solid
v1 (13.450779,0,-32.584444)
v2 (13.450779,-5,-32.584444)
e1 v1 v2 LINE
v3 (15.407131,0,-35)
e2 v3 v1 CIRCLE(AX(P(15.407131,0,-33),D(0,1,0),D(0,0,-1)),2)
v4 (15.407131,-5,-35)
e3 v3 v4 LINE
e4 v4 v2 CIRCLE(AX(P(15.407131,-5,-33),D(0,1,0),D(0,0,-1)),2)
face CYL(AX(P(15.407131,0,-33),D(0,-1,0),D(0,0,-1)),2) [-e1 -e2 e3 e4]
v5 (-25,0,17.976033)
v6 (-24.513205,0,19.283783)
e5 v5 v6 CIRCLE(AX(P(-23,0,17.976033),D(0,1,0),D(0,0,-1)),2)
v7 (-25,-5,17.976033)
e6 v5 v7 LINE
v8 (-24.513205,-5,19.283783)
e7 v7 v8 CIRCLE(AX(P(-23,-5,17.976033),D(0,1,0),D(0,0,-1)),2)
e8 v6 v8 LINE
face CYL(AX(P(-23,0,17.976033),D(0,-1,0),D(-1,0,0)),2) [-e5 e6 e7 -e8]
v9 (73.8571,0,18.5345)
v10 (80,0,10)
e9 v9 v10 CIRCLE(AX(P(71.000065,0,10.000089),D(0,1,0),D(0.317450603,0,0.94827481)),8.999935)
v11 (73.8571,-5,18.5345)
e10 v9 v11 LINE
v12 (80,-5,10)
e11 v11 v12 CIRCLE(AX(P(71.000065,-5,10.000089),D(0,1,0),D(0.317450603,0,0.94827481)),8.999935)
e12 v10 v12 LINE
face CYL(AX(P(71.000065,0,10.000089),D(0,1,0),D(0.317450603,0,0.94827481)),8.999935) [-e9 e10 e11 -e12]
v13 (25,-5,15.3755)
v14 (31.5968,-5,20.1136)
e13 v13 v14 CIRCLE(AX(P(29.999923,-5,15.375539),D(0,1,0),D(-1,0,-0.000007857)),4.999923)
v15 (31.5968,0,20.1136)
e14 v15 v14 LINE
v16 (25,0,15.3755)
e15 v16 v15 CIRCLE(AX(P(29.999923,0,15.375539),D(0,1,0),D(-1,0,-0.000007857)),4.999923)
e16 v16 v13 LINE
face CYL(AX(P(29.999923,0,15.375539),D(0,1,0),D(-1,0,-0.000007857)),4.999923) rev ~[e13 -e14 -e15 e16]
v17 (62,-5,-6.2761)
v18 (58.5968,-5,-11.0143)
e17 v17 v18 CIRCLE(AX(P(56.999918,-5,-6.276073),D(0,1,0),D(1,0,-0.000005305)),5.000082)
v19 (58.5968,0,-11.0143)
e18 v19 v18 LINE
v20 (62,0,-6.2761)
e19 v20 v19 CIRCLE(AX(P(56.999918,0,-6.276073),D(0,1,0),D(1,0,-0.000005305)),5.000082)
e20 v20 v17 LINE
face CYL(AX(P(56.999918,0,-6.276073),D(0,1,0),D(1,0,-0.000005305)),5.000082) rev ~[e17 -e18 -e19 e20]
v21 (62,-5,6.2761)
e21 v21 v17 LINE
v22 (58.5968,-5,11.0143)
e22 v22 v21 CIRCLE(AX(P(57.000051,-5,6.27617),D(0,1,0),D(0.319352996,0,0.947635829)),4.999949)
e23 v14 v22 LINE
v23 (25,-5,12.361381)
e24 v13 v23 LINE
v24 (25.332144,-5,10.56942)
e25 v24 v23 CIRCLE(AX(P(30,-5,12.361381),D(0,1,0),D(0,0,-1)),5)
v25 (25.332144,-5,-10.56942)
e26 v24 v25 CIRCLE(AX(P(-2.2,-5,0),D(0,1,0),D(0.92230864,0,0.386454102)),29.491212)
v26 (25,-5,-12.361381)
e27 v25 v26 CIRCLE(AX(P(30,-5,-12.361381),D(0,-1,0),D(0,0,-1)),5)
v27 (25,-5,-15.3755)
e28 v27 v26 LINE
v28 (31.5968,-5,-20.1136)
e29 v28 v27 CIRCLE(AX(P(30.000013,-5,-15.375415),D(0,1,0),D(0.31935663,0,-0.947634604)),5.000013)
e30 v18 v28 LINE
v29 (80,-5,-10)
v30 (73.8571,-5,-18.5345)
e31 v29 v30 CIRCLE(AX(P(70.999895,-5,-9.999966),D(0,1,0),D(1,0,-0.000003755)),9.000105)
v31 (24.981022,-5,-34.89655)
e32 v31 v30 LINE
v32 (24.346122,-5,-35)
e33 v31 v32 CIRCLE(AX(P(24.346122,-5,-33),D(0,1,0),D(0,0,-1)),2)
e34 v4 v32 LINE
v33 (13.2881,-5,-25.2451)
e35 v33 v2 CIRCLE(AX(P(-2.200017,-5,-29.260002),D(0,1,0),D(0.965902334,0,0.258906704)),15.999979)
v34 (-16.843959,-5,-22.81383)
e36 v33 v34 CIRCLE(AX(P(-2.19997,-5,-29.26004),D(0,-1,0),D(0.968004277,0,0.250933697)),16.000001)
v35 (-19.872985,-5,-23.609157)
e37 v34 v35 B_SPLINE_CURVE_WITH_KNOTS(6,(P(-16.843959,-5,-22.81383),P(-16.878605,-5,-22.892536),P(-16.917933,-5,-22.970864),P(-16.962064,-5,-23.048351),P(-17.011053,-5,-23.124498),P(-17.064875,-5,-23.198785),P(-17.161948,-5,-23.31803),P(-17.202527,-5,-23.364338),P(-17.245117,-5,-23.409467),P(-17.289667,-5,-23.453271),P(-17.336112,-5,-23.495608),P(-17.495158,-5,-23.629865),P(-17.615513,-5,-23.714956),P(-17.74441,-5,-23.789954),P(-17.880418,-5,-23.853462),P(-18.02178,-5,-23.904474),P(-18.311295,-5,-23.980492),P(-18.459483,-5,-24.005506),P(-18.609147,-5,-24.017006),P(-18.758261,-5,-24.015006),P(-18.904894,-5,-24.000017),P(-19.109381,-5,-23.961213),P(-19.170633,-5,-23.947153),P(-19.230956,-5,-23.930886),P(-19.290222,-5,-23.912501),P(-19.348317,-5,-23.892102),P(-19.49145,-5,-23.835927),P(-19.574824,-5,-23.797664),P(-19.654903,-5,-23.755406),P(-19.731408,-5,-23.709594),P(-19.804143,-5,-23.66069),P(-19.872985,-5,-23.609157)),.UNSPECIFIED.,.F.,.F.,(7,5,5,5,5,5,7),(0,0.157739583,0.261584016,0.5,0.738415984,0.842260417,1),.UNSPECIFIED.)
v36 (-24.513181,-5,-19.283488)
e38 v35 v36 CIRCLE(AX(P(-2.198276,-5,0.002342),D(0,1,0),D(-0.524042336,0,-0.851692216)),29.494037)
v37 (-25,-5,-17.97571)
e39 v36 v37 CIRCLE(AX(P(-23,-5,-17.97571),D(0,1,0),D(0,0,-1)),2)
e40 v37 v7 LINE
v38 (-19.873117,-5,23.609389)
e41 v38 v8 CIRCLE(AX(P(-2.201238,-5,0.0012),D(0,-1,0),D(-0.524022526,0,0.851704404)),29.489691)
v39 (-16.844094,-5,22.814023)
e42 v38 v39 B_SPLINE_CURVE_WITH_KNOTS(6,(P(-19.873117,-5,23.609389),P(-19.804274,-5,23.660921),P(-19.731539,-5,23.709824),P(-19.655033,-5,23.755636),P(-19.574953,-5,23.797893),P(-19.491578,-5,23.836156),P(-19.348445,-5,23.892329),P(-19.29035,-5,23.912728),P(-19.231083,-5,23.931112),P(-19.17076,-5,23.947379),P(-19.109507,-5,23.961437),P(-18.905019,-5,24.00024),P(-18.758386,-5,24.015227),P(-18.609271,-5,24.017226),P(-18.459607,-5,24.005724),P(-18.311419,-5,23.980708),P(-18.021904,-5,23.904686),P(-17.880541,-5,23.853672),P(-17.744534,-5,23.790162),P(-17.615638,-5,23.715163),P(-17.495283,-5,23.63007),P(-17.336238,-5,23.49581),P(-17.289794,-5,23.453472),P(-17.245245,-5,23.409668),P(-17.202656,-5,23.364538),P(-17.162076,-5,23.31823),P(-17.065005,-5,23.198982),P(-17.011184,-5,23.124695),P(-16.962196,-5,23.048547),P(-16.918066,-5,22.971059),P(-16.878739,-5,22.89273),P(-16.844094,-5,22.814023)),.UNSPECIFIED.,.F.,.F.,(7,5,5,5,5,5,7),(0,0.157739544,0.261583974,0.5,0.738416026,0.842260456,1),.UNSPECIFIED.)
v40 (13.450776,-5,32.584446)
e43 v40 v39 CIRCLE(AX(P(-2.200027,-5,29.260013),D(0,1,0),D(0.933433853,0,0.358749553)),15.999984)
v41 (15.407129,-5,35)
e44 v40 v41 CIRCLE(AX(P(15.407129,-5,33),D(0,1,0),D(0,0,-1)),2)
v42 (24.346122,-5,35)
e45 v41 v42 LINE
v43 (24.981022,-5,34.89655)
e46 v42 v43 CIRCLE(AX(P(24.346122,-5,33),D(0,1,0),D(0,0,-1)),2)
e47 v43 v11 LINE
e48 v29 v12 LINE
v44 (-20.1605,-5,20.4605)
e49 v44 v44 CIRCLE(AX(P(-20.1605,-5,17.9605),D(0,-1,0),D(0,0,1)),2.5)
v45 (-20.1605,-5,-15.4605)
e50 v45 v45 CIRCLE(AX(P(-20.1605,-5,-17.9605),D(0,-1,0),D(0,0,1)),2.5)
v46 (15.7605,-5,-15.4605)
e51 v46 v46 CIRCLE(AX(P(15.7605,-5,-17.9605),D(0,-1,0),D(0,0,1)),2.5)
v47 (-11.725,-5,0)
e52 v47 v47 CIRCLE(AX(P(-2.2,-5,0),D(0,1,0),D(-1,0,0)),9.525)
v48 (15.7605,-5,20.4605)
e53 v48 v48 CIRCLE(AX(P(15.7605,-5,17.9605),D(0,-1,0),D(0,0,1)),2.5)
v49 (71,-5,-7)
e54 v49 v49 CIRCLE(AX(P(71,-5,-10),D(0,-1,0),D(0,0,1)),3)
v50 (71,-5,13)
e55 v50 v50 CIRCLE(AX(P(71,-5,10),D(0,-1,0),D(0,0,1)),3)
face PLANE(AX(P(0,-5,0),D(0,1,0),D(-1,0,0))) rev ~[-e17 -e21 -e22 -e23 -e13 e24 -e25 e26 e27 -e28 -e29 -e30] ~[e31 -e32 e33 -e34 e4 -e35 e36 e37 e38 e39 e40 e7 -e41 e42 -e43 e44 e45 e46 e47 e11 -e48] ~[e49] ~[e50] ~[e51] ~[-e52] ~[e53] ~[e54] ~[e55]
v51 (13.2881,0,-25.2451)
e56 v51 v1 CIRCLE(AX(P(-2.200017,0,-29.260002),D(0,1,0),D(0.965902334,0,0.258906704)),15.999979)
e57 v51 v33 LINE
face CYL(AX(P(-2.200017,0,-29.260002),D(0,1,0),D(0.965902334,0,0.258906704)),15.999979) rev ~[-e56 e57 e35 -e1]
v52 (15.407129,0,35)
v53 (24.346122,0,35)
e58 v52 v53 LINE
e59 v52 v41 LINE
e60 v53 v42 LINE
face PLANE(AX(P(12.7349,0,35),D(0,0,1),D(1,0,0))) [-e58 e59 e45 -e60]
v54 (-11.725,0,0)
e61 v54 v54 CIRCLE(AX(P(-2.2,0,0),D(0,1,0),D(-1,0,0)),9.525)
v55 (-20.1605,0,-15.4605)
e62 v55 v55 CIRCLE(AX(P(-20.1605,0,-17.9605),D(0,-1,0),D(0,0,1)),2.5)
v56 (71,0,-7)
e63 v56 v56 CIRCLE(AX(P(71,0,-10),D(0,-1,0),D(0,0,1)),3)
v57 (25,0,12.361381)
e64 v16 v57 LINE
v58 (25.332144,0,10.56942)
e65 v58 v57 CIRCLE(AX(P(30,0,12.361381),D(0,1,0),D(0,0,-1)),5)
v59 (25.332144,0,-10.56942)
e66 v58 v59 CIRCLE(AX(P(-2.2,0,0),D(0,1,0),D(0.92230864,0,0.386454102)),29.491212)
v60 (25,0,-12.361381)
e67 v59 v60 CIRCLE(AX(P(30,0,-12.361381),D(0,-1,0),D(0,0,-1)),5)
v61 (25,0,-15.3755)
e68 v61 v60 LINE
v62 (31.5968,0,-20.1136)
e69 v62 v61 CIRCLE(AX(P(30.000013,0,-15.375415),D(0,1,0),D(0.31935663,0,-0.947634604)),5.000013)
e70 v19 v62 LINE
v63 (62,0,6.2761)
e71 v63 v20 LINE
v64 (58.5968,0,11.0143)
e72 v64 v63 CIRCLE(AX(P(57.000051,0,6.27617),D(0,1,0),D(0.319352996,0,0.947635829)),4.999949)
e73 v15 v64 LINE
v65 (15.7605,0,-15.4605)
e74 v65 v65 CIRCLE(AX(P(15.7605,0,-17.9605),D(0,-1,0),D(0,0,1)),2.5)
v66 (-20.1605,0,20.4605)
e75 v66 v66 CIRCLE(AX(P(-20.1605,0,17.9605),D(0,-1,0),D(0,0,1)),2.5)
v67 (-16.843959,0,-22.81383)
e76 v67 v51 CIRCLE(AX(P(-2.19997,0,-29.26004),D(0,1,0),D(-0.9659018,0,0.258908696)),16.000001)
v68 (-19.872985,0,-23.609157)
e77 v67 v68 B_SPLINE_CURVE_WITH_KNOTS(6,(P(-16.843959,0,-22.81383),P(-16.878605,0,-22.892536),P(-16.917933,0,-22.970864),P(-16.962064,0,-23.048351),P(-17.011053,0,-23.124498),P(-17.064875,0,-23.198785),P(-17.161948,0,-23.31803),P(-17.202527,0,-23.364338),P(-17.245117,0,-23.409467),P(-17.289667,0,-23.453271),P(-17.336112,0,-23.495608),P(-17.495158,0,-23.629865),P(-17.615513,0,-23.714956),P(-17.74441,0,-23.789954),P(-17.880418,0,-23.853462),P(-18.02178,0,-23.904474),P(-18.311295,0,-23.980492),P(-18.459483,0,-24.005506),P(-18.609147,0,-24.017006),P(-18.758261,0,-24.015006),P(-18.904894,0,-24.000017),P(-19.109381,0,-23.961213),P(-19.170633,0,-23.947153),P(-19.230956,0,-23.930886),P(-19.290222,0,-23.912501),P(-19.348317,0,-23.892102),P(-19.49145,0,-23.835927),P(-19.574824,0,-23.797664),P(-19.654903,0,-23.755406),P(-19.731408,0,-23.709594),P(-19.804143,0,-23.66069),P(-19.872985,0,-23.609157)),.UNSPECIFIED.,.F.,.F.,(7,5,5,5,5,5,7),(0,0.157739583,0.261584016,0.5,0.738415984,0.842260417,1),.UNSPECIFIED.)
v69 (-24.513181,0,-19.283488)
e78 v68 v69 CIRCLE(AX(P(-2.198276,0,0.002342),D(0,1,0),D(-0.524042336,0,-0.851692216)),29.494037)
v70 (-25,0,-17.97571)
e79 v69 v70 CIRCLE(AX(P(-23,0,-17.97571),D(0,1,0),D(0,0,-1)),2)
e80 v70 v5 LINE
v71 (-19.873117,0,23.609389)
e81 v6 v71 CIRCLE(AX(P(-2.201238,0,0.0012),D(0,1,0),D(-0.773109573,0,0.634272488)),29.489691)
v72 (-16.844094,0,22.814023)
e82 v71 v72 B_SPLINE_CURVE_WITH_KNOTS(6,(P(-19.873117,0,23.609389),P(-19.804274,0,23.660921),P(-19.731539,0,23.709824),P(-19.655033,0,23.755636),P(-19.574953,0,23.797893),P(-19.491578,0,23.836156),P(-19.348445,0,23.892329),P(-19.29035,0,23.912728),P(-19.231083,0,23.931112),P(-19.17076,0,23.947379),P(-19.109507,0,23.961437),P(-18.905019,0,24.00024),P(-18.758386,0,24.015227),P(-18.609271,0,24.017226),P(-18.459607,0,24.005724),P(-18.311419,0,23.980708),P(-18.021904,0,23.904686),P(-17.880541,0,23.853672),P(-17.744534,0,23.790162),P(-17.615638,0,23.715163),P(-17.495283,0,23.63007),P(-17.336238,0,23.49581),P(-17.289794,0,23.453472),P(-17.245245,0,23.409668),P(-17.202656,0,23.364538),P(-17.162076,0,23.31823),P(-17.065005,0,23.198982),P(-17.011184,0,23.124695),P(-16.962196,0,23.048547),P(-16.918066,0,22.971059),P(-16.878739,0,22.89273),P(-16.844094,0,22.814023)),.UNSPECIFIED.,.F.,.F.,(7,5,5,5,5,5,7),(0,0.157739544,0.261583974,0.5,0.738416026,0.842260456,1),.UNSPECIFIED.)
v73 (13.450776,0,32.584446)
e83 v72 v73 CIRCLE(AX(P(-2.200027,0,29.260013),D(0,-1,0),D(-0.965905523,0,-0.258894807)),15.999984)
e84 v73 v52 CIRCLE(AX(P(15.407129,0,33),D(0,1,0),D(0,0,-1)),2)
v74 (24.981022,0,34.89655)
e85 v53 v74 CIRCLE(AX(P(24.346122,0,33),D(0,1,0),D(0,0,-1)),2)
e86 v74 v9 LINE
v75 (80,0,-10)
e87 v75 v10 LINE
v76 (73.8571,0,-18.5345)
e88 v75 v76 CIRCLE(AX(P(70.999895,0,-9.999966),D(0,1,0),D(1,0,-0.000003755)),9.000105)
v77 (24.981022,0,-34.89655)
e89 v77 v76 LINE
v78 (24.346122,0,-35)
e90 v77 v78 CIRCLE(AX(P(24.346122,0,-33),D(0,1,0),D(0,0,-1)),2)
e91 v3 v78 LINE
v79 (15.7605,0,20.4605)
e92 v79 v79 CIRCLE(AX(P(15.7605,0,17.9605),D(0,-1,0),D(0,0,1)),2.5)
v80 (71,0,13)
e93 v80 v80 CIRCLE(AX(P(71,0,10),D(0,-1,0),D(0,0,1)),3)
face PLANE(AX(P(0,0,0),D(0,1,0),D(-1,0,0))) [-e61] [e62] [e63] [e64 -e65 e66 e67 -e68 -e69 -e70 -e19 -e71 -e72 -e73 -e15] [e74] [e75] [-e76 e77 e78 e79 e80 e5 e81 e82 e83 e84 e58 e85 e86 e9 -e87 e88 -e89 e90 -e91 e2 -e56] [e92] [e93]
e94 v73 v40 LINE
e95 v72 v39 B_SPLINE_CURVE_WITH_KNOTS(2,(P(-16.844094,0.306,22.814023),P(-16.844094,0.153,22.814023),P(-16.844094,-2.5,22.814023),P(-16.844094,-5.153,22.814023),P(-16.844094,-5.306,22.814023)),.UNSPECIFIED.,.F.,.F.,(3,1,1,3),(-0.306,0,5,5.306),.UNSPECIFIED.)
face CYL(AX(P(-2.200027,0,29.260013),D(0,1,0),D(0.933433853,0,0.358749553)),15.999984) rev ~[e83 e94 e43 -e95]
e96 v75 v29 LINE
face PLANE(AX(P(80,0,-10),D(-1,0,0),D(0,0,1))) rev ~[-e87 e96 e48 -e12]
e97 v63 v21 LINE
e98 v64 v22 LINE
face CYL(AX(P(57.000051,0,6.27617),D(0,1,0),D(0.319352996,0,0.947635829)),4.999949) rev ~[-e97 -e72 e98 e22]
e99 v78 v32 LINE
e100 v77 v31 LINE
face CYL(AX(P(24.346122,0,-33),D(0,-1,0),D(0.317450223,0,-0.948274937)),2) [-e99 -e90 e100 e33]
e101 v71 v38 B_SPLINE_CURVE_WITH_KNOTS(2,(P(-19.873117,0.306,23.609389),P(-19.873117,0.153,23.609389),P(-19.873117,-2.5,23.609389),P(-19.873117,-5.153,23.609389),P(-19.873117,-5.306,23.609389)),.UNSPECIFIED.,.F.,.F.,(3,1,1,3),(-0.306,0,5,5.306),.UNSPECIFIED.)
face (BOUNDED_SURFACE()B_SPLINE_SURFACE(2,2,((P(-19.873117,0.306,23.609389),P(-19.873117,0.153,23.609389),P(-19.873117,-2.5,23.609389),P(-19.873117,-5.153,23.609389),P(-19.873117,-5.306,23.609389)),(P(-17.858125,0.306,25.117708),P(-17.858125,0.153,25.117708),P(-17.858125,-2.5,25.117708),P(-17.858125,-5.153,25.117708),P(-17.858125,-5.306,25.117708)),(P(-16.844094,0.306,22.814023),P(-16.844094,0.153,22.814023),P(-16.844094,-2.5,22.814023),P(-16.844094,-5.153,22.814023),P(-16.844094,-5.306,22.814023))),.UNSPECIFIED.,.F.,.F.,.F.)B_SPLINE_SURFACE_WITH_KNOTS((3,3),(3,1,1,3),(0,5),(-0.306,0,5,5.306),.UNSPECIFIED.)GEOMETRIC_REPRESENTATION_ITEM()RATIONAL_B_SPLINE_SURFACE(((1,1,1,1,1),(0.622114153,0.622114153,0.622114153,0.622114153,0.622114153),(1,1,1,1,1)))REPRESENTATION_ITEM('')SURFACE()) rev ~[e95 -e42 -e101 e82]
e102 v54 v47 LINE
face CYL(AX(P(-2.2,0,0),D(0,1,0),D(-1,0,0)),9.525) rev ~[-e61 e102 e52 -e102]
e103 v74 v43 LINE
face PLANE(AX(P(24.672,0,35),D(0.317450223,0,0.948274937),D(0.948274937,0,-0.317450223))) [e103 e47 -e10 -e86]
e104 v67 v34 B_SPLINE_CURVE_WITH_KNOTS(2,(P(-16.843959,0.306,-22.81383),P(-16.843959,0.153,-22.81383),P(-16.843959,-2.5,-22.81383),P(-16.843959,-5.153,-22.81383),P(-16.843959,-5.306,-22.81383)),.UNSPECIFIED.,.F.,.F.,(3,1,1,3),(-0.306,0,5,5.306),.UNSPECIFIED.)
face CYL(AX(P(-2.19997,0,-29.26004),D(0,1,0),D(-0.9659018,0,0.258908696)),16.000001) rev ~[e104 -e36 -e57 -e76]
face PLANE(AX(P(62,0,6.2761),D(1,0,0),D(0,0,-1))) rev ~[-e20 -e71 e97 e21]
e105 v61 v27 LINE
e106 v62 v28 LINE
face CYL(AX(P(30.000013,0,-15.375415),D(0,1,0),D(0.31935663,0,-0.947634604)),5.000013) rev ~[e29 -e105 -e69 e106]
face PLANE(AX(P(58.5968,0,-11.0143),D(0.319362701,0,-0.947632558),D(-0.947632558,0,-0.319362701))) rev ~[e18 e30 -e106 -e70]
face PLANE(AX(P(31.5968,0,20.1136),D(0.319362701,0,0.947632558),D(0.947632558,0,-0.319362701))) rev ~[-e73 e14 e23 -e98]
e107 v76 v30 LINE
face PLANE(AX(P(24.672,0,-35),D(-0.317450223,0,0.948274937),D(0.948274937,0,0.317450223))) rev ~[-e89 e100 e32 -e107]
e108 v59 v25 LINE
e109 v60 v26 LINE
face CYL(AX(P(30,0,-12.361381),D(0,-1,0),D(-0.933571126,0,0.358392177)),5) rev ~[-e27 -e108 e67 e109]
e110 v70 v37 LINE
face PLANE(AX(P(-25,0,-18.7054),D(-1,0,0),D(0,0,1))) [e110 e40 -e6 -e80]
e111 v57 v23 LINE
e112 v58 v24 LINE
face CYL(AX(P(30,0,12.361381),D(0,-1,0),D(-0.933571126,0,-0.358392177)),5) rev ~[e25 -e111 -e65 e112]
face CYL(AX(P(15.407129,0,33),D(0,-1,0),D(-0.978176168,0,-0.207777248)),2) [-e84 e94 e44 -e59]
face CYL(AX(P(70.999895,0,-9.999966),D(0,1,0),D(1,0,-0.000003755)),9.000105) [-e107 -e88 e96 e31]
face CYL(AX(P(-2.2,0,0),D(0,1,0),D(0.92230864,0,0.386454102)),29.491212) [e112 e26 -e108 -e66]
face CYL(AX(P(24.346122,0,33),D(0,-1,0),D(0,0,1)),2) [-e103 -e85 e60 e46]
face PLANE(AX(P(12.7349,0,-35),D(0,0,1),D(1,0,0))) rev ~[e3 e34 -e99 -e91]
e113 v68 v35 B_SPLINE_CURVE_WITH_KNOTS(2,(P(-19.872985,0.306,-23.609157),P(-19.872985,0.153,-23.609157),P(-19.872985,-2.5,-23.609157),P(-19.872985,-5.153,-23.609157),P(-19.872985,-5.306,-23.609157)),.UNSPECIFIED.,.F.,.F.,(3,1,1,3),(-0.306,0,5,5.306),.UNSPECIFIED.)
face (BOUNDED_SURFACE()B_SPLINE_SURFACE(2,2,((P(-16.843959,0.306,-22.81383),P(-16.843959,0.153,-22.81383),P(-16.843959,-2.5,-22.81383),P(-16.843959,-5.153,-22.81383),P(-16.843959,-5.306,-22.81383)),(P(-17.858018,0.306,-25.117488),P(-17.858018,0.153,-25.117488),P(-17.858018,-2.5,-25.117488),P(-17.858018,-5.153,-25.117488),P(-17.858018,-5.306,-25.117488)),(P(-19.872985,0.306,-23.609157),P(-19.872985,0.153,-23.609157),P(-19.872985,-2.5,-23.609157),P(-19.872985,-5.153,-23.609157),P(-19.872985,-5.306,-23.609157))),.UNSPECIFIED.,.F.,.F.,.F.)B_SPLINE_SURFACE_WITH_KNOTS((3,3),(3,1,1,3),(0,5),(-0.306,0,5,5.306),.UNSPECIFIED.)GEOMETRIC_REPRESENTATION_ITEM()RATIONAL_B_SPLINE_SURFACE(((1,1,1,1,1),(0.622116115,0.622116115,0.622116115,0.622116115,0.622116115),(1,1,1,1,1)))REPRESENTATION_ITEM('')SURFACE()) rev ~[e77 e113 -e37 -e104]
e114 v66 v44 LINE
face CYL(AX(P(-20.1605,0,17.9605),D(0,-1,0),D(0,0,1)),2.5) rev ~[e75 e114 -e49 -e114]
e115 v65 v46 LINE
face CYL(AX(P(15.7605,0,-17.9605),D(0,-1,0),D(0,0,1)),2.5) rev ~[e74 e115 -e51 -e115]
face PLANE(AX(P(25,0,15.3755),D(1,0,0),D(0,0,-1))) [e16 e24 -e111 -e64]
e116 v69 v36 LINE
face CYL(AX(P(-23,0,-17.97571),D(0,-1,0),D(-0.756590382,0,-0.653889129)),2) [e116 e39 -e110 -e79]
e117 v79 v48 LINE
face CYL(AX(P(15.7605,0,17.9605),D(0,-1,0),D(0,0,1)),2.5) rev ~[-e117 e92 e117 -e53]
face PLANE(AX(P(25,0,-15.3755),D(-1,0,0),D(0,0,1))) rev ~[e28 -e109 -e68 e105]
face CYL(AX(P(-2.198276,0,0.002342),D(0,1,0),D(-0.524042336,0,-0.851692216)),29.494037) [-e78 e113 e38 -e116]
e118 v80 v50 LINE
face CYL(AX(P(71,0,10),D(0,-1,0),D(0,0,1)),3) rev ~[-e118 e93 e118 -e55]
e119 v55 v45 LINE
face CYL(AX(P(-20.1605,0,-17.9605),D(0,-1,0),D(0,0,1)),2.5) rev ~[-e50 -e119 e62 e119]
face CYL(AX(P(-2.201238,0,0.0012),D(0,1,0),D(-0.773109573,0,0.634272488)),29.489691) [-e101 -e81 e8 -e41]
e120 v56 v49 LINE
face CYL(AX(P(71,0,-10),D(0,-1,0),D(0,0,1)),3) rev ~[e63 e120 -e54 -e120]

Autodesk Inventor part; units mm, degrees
ref_plane "YZ Plane" through (0, 0, 0) normal (1, 0, 0) x (0, 1, 0)
ref_plane "XZ Plane" through (0, 0, 0) normal (0, 1, 0) x (-1, 0, 0)
ref_plane "XY Plane" through (0, 0, 0) normal (0, 0, 1) x (1, 0, 0)
sketch "Sketch1" plane through (0, 0, 0) normal (0, 1, 0) x (-1, 0, 0)
  circle A0 centre (2.2, 0) radius 9.525 projected
  circle A1 centre (-15.7605, -17.9605) radius 2.0193 construction
  circle A2 centre (20.1605, -17.9605) radius 2.0193 construction
  circle A3 centre (20.1605, 17.9605) radius 2.0193 construction
  circle A4 centre (-15.7605, 17.9605) radius 2.0193 construction
  circle A5 centre (2.2, -29.26) radius 15.5575 construction
  circle A6 centre (2.2, 29.26) radius 15.5575 construction
  circle A7 centre (-71, 10) radius 3 construction
  circle A8 centre (-71, -10) radius 3 construction
  line L0 (-93.1199, -15.5417) -> (-49.1294, -16.4557) construction
  line L1 (-49.1294, -16.4557) -> (-48.8801, -4.4583) construction
  line L2 (-92.8706, -3.5443) -> (-48.8801, -4.4583) construction
  line L3 (-93.1199, -15.5417) -> (-92.8706, -3.5443) construction
  line L4 (-25, 210) -> (-25, -210) construction
  line L5 (25, 210) -> (25, -210) construction
  arc A9 (17.6544, -25.1175) -> (-13.2881, -25.2451) centre (2.2, -29.26) ccw
  circle A10 centre (-71, -10) radius 9 construction
  circle A11 centre (-71, 10) radius 9 construction
  line L6 (23, -35) -> (-24.672, -35) construction
  line L7 (-24.672, 35) -> (23, 35) construction
  line L8 (25, -18.7054) -> (25, 18.7057)
  arc A12 (17.6544, -25.1175) -> (25, -18.7054) centre (2.2, 0) ccw
  arc A13 (-13.2544, -25.1175) -> (-12.7349, -35) centre (2.2, -29.26) ccw
  arc A14 (-12.7349, 35) -> (17.6545, 25.1177) centre (2.2, 29.26) ccw
  arc A15 (25, 18.7057) -> (17.6545, 25.1177) centre (2.2, 0) ccw
  line L9 (-12.7349, -35) -> (-24.672, -35)
  line L10 (-12.7349, 35) -> (-24.672, 35)
  line L11 (-24.672, -35) -> (-73.8571, -18.5345)
  line L12 (-24.672, 35) -> (-73.8571, 18.5345)
  line L13 (-80, -10) -> (-80, 10)
  arc A16 (-80, -10) -> (-73.8571, -18.5345) centre (-71, -10) ccw
  arc A17 (-73.8571, 18.5345) -> (-80, 10) centre (-71, 10) ccw
  line L14 (-58.5968, -11.0143) -> (-31.5968, -20.1136) projected
  arc A18 (-62, -6.2761) -> (-58.5968, -11.0143) centre (-57, -6.2761) ccw projected
  line L15 (-62, 6.2761) -> (-62, -6.2761) projected
  arc A19 (-58.5968, 11.0143) -> (-62, 6.2761) centre (-57, 6.2761) ccw projected
  line L16 (-31.5968, 20.1136) -> (-58.5968, 11.0143) projected
  arc A20 (-25, 15.3755) -> (-31.5968, 20.1136) centre (-30, 15.3755) ccw projected
  arc A21 (-31.5968, -20.1136) -> (-25, -15.3755) centre (-30, -15.3755) ccw projected
  arc A22 (-25, 11.397) -> (-25, -11.397) centre (2.2, 0) ccw
  line L17 (-25, -15.3755) -> (-25, -11.397)
  line L18 (-25, 15.3755) -> (-25, 11.397)
  arc A23 (-18.6534, -20.8534) -> (23.0534, 20.8534) centre (2.2, 0) ccw projected
  spline S0 degree 3 poles (23.0534, 20.8534) (21.798, 22.1089) (20.4403, 23.2417) (18.9803, 24.2518) (18.9572, 24.2679) (18.9354, 24.2829) (18.9107, 24.2998) (17.3595, 25.3666) (15.7211, 26.2765) (13.9955, 27.0296) (13.9681, 27.0415) (13.9418, 27.0529) (13.9132, 27.0653) (12.1415, 27.8321) (10.3123, 28.4192) (8.4258, 28.8266) (8.3649, 28.8397) (8.3053, 28.8524) (8.243, 28.8654) (6.2506, 29.2826) (4.2356, 29.4912) (2.2, 29.4912) (0.228, 29.4912) (-1.724, 29.2955) (-3.6561, 28.9039) (-3.7184, 28.8913) (-3.7821, 28.8782) (-3.843, 28.8654) (-5.7631, 28.4635) (-7.6246, 27.8758) (-9.4274, 27.1023) (-9.456, 27.09) (-9.4858, 27.0772) (-9.5132, 27.0653) (-11.241, 26.3176) (-12.8822, 25.4127) (-14.4368, 24.3505) (-14.4614, 24.3337) (-14.4875, 24.3158) (-14.5107, 24.2998) (-15.9968, 23.278) (-17.3782, 22.1287) (-18.6534, 20.8534) (-19.9088, 19.5981) (-21.0416, 18.2404) (-22.0518, 16.7803) (-22.0679, 16.7572) (-22.0829, 16.7354) (-22.0998, 16.7107) (-23.1666, 15.1595) (-24.0765, 13.5211) (-24.8296, 11.7955) (-24.8415, 11.7681) (-24.8529, 11.7418) (-24.8653, 11.7132) (-25.6321, 9.9415) (-26.2192, 8.1123) (-26.6266, 6.2258) (-26.6397, 6.1649) (-26.6524, 6.1053) (-26.6654, 6.043) (-27.0826, 4.0506) (-27.2912, 2.0356) (-27.2912, 0) (-27.2912, -1.972) (-27.0955, -3.924) (-26.7039, -5.8561) (-26.6913, -5.9184) (-26.6782, -5.9821) (-26.6654, -6.043) (-26.2635, -7.9631) (-25.6758, -9.8246) (-24.9023, -11.6274) (-24.89, -11.656) (-24.8772, -11.6858) (-24.8653, -11.7132) (-24.1176, -13.441) (-23.2127, -15.0822) (-22.1505, -16.6368) (-22.1337, -16.6614) (-22.1158, -16.6875) (-22.0998, -16.7107) (-21.0779, -18.1969) (-19.929, -19.5778) (-18.6534, -20.8534) knots 0 0 0 0 0.061523 0.061523 0.061523 0.0625 0.0625 0.0625 0.124023 0.124023 0.124023 0.125 0.125 0.125 0.185547 0.185547 0.185547 0.1875 0.1875 0.1875 0.25 0.25 0.25 0.310547 0.310547 0.310547 0.3125 0.3125 0.3125 0.374023 0.374023 0.374023 0.375 0.375 0.375 0.436523 0.436523 0.436523 0.4375 0.4375 0.4375 0.5 0.5 0.5 0.561523 0.561523 0.561523 0.5625 0.5625 0.5625 0.624023 0.624023 0.624023 0.625 0.625 0.625 0.685547 0.685547 0.685547 0.6875 0.6875 0.6875 0.75 0.75 0.75 0.810547 0.810547 0.810547 0.8125 0.8125 0.8125 0.874023 0.874023 0.874023 0.875 0.875 0.875 0.936523 0.936523 0.936523 0.9375 0.9375 0.9375 1 1 1 1 projected
  point P0 (0, 0)
  point P1 (-13.2881, -25.2451)
  dimension "d4" = 16
  dimension "d5" = 18
  dimension "d6" = 18
  dimension "d7" = 16
extrude "Extrusion1" add sketch "Sketch1" against normal blind 5 contours A9 A23 S0 A22 A14 A15 L8 A12 | A9 A13 L9 L11 A16 L13 A17 L12 L10 A14 S0 L18 A20 L16 A19 L15 A18 L14 A21 L17 A23
fillet "Fillet1" radius 5 2 edges at (25, -2.5, 11.397) (25, -2.5, -11.397)
fillet "Fillet2" radius 2 8 edges at (12.7349, -2.5, 35) (-17.6545, -2.5, 25.1177) (-17.6544, -2.5, -25.1175) (12.7349, -2.5, -35) (24.672, -2.5, -35) (24.672, -2.5, 35) (-25, -2.5, -18.7054) (-25, -2.5, 18.7057)
sketch "Sketch2" plane through (0, 0, 0) normal (0, 1, 0) x (1, 0, 0)
  circle A0 centre (71, 10) radius 3 projected
  circle A1 centre (71, -10) radius 3 projected
  point P0 (0, 0)
hole "Hole1" at (71, 0, -10) at (71, 0, 10) direction (0, -1, 0) diameter 6 end through all
sketch "Sketch3" plane through (0, 0, 0) normal (0, 1, 0) x (1, 0, 0)
  point P0 (0, 0)
sketch "Sketch4" plane through (0, 0, 0) normal (0, 1, 0) x (1, 0, 0)
  circle A0 centre (-20.1605, -17.9605) radius 3 projected
  circle A1 centre (15.7605, 17.9605) radius 3 projected
  circle A2 centre (15.7605, -17.9605) radius 3 projected
  circle A3 centre (-20.1605, 17.9605) radius 3 projected
  circle A4 centre (-4, -61.01) radius 14.2875 projected
  circle A5 centre (-2.2, 29.26) radius 14.2875 projected
  circle A6 centre (-2.2, -29.26) radius 14.2875 projected
  circle A7 centre (-4, 61.01) radius 14.2875 projected
  circle A8 centre (-2.2, 0) radius 9.5 projected
  line L0 (-25, -210) -> (25, -210) projected
  line L1 (25, -210) -> (25, 210) projected
  line L2 (-25, 210) -> (25, 210) projected
  line L3 (-25, -210) -> (-25, 210) projected
  point P0 (0, 0)
hole "Hole2" at (15.7605, 0, -17.9605) at (15.7605, 0, 17.9605) at (-20.1605, 0, 17.9605) at (-20.1605, 0, -17.9605) direction (0, -1, 0) diameter 5 depth 8 tip angle 118
properties part number "pistonplatefront"
